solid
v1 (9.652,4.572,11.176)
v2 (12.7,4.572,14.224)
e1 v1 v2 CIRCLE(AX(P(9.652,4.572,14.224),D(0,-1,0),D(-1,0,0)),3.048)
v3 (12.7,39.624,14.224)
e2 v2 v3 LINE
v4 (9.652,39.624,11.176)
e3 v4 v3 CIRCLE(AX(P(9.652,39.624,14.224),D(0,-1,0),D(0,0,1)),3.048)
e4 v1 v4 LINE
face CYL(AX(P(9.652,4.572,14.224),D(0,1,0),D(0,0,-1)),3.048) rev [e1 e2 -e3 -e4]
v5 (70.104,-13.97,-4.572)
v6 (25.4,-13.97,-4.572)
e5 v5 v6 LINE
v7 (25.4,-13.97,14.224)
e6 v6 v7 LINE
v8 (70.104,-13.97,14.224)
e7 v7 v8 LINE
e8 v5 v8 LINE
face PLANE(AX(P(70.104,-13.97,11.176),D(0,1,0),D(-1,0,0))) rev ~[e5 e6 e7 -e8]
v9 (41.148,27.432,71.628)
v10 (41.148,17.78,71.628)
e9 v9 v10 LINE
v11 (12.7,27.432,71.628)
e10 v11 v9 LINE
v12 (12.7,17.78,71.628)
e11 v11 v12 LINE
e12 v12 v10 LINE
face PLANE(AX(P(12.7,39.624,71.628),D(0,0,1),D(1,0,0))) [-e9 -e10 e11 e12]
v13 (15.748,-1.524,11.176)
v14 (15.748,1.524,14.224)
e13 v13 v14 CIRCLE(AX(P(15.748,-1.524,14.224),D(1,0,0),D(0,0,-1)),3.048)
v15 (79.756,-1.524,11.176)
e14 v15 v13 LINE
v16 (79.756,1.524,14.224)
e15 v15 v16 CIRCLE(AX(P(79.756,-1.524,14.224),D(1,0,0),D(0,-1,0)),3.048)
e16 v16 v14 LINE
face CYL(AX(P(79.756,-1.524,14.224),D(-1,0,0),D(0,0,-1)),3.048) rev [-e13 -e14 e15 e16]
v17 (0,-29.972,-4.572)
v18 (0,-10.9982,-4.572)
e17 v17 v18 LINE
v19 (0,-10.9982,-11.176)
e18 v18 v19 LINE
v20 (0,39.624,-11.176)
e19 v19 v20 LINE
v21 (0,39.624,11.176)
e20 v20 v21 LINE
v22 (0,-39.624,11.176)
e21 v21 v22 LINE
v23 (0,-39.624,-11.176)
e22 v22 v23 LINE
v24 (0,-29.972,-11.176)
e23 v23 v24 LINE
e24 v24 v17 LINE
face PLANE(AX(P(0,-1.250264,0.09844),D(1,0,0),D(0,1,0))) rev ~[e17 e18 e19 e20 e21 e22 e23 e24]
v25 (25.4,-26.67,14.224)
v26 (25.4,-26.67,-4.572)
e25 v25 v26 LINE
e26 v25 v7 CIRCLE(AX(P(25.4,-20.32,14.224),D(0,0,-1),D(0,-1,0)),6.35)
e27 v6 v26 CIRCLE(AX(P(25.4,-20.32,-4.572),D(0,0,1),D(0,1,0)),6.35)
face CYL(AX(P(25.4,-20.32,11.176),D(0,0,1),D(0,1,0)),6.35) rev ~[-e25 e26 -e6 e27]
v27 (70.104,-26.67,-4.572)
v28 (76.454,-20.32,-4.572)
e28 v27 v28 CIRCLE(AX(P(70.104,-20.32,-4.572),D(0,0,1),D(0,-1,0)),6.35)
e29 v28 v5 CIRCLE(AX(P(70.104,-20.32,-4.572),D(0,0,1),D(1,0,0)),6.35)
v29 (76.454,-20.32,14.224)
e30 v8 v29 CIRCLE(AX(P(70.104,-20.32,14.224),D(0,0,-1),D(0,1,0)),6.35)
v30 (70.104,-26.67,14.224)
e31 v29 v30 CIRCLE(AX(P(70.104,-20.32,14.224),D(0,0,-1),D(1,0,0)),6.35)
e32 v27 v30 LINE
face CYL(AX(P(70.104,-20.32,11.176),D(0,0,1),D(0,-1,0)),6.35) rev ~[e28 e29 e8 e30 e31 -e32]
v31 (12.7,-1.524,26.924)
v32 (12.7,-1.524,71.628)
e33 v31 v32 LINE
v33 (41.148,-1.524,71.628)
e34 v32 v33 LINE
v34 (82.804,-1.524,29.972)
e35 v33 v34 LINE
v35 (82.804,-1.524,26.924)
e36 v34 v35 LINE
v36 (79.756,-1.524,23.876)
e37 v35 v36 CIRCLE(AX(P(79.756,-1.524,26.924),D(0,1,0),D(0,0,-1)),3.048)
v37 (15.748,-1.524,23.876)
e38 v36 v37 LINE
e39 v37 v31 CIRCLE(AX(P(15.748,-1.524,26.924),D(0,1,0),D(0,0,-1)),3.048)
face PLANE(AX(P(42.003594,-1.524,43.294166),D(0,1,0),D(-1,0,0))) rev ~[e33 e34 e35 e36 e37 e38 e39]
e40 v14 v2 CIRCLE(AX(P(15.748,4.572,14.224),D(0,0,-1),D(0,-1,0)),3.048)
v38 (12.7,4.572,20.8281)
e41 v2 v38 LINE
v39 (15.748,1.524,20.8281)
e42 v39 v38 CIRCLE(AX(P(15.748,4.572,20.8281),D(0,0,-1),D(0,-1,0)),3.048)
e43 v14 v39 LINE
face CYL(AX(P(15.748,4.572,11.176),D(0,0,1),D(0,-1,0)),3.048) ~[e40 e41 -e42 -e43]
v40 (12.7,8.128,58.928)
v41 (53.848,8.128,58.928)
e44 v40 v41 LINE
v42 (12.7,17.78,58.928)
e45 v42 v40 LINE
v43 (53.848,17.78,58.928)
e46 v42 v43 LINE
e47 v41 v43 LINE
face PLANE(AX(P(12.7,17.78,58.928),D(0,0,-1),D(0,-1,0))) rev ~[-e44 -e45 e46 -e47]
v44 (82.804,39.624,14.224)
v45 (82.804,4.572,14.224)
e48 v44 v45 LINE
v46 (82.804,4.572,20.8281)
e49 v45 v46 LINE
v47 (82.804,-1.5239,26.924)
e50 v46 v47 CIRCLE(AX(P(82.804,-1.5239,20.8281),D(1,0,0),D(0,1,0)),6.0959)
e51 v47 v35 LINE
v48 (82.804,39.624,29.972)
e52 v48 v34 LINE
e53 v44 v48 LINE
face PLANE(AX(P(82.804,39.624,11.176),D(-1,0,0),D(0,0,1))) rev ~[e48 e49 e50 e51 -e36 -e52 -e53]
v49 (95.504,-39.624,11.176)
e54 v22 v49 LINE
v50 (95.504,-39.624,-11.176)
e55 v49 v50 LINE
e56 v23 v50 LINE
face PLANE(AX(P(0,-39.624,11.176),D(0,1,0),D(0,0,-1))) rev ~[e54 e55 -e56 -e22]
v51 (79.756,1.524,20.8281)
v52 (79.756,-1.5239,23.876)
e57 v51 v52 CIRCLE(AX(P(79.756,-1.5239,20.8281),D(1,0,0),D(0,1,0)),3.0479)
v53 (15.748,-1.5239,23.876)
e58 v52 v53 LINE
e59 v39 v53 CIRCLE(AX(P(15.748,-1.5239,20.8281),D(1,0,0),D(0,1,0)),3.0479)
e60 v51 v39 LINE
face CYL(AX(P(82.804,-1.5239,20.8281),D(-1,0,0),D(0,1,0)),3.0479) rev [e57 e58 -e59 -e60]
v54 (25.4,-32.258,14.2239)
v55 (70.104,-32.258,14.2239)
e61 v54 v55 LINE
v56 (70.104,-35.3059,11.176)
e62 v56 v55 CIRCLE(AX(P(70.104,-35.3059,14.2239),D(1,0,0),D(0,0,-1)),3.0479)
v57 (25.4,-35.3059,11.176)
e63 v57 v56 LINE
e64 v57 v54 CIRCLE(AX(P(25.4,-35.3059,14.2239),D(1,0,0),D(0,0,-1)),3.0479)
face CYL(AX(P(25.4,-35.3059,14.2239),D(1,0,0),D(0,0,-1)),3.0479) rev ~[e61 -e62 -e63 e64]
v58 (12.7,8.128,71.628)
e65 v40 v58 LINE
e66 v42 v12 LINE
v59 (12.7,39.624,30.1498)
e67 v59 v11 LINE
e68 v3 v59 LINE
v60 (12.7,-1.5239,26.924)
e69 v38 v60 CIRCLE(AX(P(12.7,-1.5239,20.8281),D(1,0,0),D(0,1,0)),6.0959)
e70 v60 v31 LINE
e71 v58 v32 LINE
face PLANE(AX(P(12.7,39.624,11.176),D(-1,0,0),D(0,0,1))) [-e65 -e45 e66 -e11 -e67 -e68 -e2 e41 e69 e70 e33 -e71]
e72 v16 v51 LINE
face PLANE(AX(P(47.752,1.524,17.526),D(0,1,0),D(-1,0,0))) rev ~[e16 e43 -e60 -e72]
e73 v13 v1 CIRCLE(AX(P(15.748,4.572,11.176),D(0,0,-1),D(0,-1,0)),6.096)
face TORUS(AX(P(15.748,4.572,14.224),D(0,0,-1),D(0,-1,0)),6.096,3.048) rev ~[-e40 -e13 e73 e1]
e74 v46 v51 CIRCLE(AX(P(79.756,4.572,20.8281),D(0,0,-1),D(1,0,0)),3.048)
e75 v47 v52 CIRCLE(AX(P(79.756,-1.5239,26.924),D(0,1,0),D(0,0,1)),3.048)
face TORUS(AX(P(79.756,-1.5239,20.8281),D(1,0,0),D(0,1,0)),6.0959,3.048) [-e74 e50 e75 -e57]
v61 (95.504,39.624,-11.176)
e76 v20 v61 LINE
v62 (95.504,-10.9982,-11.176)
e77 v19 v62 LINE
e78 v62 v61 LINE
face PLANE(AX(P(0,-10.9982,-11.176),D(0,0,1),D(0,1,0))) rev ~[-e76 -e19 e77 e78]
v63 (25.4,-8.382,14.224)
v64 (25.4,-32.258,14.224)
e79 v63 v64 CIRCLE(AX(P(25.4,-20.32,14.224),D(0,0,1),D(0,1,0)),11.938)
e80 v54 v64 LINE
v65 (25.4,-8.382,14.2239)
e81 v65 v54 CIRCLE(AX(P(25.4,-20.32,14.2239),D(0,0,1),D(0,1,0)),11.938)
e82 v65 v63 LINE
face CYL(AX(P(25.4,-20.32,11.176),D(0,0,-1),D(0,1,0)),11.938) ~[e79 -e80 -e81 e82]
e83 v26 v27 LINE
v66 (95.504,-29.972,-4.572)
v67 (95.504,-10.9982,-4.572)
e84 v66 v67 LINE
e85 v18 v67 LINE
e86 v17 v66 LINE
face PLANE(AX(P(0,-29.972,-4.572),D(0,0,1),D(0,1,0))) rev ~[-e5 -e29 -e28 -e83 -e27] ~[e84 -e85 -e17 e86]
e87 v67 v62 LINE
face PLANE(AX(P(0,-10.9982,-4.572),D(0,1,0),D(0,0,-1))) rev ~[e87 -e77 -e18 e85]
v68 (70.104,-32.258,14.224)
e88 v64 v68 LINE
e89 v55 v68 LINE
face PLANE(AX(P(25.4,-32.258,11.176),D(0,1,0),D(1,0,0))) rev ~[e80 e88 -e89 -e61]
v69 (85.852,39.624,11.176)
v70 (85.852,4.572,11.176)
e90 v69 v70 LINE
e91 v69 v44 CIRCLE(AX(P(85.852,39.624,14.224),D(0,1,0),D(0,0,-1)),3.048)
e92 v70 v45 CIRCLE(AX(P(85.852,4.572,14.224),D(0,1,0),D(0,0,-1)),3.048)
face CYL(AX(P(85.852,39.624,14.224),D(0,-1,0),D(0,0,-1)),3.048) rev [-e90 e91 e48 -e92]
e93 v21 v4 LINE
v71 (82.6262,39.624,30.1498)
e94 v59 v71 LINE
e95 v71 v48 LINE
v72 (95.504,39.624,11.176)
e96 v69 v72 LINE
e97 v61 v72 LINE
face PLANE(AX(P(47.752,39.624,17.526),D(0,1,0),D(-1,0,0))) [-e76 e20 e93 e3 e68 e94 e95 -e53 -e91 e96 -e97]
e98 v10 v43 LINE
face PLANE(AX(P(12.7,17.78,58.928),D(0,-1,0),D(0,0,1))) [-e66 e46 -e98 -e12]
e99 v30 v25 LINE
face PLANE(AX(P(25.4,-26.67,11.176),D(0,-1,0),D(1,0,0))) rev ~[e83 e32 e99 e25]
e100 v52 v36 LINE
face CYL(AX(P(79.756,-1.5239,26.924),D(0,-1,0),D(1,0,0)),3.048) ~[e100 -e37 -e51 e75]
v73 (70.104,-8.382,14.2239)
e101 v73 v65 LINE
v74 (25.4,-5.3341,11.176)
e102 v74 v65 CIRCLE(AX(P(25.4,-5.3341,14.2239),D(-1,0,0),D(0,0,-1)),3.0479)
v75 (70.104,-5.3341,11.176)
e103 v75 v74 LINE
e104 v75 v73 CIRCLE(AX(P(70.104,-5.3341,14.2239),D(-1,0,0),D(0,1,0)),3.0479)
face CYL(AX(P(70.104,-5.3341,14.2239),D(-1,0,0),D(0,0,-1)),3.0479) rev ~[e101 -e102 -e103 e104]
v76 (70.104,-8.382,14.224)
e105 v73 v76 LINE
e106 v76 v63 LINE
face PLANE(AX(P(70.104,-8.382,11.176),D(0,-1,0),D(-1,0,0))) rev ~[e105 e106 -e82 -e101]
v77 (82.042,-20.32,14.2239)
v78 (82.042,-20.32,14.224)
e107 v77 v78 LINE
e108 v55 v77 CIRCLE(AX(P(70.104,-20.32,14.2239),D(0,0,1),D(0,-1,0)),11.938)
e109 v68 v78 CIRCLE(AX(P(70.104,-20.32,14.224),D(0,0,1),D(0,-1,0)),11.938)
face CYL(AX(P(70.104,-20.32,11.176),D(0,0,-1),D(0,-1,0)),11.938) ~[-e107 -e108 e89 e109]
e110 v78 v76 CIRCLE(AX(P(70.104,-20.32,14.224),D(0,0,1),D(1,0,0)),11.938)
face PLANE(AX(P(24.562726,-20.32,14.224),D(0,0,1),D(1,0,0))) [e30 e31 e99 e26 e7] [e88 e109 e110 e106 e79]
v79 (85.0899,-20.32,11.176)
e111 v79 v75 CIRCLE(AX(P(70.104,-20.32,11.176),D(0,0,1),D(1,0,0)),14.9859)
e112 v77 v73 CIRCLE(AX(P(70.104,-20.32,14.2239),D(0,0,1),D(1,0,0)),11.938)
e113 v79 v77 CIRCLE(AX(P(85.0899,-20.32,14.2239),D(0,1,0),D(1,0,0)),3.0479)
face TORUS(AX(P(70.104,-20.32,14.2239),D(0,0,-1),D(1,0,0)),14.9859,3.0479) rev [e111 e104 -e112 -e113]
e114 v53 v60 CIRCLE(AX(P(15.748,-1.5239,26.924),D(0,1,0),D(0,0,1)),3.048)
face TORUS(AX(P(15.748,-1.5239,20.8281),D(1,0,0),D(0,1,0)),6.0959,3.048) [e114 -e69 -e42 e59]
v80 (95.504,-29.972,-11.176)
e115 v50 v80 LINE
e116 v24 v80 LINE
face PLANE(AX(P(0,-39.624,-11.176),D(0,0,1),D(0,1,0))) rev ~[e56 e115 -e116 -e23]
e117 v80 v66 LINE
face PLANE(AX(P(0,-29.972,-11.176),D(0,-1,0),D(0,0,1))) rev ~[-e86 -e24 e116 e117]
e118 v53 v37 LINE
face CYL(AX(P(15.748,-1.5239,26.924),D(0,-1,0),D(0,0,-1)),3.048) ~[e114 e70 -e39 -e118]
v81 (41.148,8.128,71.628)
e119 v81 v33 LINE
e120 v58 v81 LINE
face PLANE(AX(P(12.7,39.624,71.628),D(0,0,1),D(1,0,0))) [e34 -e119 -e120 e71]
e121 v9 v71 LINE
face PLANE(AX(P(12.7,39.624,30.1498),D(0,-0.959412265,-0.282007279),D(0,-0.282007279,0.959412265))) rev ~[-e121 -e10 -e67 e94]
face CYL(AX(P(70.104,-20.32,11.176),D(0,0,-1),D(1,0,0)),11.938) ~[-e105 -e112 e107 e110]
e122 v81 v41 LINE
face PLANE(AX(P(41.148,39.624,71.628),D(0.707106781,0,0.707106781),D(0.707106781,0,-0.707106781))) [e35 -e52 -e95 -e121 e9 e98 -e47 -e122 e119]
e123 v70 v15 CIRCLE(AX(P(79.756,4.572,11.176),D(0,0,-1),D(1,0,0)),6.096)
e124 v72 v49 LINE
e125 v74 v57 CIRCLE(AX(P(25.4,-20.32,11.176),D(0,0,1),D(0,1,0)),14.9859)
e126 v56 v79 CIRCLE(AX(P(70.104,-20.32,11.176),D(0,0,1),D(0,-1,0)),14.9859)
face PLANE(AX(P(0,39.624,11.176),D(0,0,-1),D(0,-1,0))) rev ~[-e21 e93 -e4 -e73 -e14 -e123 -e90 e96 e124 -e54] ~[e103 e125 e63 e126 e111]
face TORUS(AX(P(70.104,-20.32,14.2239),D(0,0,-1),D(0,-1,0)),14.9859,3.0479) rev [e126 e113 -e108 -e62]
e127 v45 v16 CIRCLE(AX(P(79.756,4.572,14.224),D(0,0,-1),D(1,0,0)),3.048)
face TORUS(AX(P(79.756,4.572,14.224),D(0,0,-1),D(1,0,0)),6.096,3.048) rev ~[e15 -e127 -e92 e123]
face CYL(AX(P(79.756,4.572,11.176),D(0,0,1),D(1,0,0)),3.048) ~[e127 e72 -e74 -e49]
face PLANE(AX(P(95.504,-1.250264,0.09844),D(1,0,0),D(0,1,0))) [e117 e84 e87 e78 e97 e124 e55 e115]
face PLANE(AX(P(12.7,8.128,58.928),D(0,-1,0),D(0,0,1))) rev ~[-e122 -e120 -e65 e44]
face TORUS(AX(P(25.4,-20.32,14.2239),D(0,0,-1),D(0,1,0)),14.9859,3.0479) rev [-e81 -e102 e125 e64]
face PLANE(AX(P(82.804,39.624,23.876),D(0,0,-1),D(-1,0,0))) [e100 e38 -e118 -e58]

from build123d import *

# Parameters (mm, degrees)
F1_DEPTH = 95.504
F3_DEPTH = 3.048
F4_DEPTH = 22.353
F6_DEPTH = 41.148
F5_W     = 70.104
F5_H     = 12.7
F7_DEPTH = 38.1
F8_W     = 9.652
F8_H     = 12.7
F9_DEPTH = 82.805
F10_F1_R = 3.0479
F10_F2_R = 3.048
F10_F3_R = 3.048


# Not quite as in the source:
# - a fillet or chamfer is up to 0.001 mm smaller than in the source, because OpenCascade refuses the exact size


with BuildPart() as f1:
    # F0 (on Right) → F1 (new body)
    with BuildSketch(Plane.YZ):
        Polygon((39.624, -11.176), (39.624, 11.176), (-39.624, 11.176), (-39.624, -11.176), (-29.972, -11.176), (-29.972, -4.572), (-10.9982, -4.572), (-10.9982, -11.176), align=None)
    extrude(amount=F1_DEPTH)

    # F2 (on face) → F3 (join)
    with BuildSketch(Plane.XY.offset(11.176)):
        with BuildLine():
            ThreePointArc((25.4, -26.67), (19.05, -20.32), (25.4, -13.97))
            Line((25.4, -13.97), (35.509072361, -13.97))
            ThreePointArc((35.509072361, -13.97), (31.1753590365, -9.871982389), (25.4, -8.382))
            ThreePointArc((25.4, -8.382), (13.462, -20.32), (25.4, -32.258))
            ThreePointArc((25.4, -32.258), (31.1753590365, -30.768017611), (35.509072361, -26.67))
            Line((35.509072361, -26.67), (25.4, -26.67))
        make_face()
        with BuildLine():
            ThreePointArc((25.4, -8.382), (31.1753590365, -9.871982389), (35.509072361, -13.97))
            Line((35.509072361, -13.97), (59.994927639, -13.97))
            ThreePointArc((59.994927639, -13.97), (64.3286409635, -9.871982389), (70.104, -8.382))
            Line((70.104, -8.382), (25.4, -8.382))
        make_face()
        with BuildLine():
            Line((59.994927639, -26.67), (35.509072361, -26.67))
            ThreePointArc((35.509072361, -26.67), (31.1753590365, -30.768017611), (25.4, -32.258))
            Line((25.4, -32.258), (70.104, -32.258))
            ThreePointArc((70.104, -32.258), (64.3286409635, -30.768017611), (59.994927639, -26.67))
        make_face()
        with BuildLine():
            ThreePointArc((70.104, -8.382), (64.3286409635, -9.871982389), (59.994927639, -13.97))
            Line((59.994927639, -13.97), (70.104, -13.97))
            ThreePointArc((70.104, -13.97), (74.5941280605, -15.8298719395), (76.454, -20.32))
            ThreePointArc((76.454, -20.32), (74.5941280605, -24.8101280605), (70.104, -26.67))
            Line((70.104, -26.67), (59.994927639, -26.67))
            ThreePointArc((59.994927639, -26.67), (64.3286409635, -30.768017611), (70.104, -32.258))
            ThreePointArc((70.104, -32.258), (78.5454407538, -28.7614407538), (82.042, -20.32))
            ThreePointArc((82.042, -20.32), (78.5454407538, -11.8785592462), (70.104, -8.382))
        make_face()
    extrude(amount=F3_DEPTH)

    # F2 (on face) → F4 (cut, through all)
    with BuildSketch(Plane.XY.offset(11.176)):
        with BuildLine():
            ThreePointArc((25.4, -26.67), (29.8901280605, -24.8101280605), (31.75, -20.32))
            ThreePointArc((31.75, -20.32), (29.8901280605, -15.8298719395), (25.4, -13.97))
            ThreePointArc((25.4, -13.97), (19.05, -20.32), (25.4, -26.67))
        make_face()
        with BuildLine():
            ThreePointArc((25.4, -13.97), (29.8901280605, -15.8298719395), (31.75, -20.32))
            ThreePointArc((31.75, -20.32), (29.8901280605, -24.8101280605), (25.4, -26.67))
            Line((25.4, -26.67), (35.509072361, -26.67))
            ThreePointArc((35.509072361, -26.67), (36.8716596412, -23.6240685642), (37.338, -20.32))
            ThreePointArc((37.338, -20.32), (36.8716596412, -17.0159314358), (35.509072361, -13.97))
            Line((35.509072361, -13.97), (25.4, -13.97))
        make_face()
        with BuildLine():
            Line((59.994927639, -13.97), (35.509072361, -13.97))
            ThreePointArc((35.509072361, -13.97), (36.8716596412, -17.0159314358), (37.338, -20.32))
            ThreePointArc((37.338, -20.32), (36.8716596412, -23.6240685642), (35.509072361, -26.67))
            Line((35.509072361, -26.67), (59.994927639, -26.67))
            ThreePointArc((59.994927639, -26.67), (58.166, -20.32), (59.994927639, -13.97))
        make_face()
        with BuildLine():
            Line((70.104, -13.97), (59.994927639, -13.97))
            ThreePointArc((59.994927639, -13.97), (58.166, -20.32), (59.994927639, -26.67))
            Line((59.994927639, -26.67), (70.104, -26.67))
            ThreePointArc((70.104, -26.67), (63.754, -20.32), (70.104, -13.97))
        make_face()
        with BuildLine():
            ThreePointArc((76.454, -20.32), (74.5941280605, -15.8298719395), (70.104, -13.97))
            ThreePointArc((70.104, -13.97), (63.754, -20.32), (70.104, -26.67))
            ThreePointArc((70.104, -26.67), (74.5941280605, -24.8101280605), (76.454, -20.32))
        make_face()
    extrude(amount=-F4_DEPTH, mode=Mode.SUBTRACT)



with BuildPart() as f6:
    # F5 (on face) → F6 (new body)
    with BuildSketch(Plane(origin=(0, 39.624, 0), x_dir=(-1, 0, 0), z_dir=(0, 1, 0))):
        Polygon((-82.804, 29.972), (-82.804, 23.876), (-12.7, 23.876), (-12.7, 71.628), (-41.148, 71.628), align=None)
    extrude(amount=-F6_DEPTH)


with BuildPart() as f1_1:
    add(f1.part)

    add(f6.part)  # F7 merges F6
    # F5 (on face) → F7 (join)
    with BuildSketch(Plane(origin=(0, 39.624, 0), x_dir=(-1, 0, 0), z_dir=(0, 1, 0))):
        with Locations((-47.752, 17.526)):
            Rectangle(F5_W, F5_H)
    extrude(amount=-F7_DEPTH)

    # F8 (on face) → F9 (cut, through all)
    with BuildSketch(Plane(origin=(12.7, 0, 0), x_dir=(0, -1, 0), z_dir=(-1, 0, 0))):
        Polygon((-39.624, 71.628), (-39.624, 30.1498), (-27.432, 71.628), align=None)
        with Locations((-12.954, 65.278)):
            Rectangle(F8_W, F8_H)
    extrude(amount=-F9_DEPTH, mode=Mode.SUBTRACT)

    # F10: fillet of radius 3.048 on 10 edges, made by hand

    # F10_f1 (radius 3.048 in the source; OpenCascade refuses exactly that, so slightly less here)
    f10_f1_edges = [f1_1.edges().sort_by_distance(p)[0] for p in [
        (47.752, 1.524, 23.876),
        (47.752, -32.258, 11.176),
        (82.042, -20.32, 11.176),
        (47.752, -8.382, 11.176),
        (13.462, -20.32, 11.176),
    ]]
    fillet(f10_f1_edges, radius=F10_F1_R)

    # F10_f2
    f10_f2_edges = [f1_1.edges().sort_by_distance(p)[0] for p in [
        (82.804, 1.524, 16.00205),
        (12.7, 1.524, 16.00205),
        (12.7, 0.6312907584, 22.9832907584),
        (82.804, 0.6312907584, 22.9832907584),
    ]]
    fillet(f10_f2_edges, radius=F10_F2_R)

    # F10_f3
    f10_f3_edges = [f1_1.edges().sort_by_distance(p)[0] for p in [
        (47.752, 1.524, 11.176),
        (12.7, 22.098, 11.176),
        (82.804, 22.098, 11.176),
        (81.9112614691, 2.4167385309, 11.176),
        (13.5927385309, 2.4167385309, 11.176),
    ]]
    fillet(f10_f3_edges, radius=F10_F3_R)


solid = f1_1.part
